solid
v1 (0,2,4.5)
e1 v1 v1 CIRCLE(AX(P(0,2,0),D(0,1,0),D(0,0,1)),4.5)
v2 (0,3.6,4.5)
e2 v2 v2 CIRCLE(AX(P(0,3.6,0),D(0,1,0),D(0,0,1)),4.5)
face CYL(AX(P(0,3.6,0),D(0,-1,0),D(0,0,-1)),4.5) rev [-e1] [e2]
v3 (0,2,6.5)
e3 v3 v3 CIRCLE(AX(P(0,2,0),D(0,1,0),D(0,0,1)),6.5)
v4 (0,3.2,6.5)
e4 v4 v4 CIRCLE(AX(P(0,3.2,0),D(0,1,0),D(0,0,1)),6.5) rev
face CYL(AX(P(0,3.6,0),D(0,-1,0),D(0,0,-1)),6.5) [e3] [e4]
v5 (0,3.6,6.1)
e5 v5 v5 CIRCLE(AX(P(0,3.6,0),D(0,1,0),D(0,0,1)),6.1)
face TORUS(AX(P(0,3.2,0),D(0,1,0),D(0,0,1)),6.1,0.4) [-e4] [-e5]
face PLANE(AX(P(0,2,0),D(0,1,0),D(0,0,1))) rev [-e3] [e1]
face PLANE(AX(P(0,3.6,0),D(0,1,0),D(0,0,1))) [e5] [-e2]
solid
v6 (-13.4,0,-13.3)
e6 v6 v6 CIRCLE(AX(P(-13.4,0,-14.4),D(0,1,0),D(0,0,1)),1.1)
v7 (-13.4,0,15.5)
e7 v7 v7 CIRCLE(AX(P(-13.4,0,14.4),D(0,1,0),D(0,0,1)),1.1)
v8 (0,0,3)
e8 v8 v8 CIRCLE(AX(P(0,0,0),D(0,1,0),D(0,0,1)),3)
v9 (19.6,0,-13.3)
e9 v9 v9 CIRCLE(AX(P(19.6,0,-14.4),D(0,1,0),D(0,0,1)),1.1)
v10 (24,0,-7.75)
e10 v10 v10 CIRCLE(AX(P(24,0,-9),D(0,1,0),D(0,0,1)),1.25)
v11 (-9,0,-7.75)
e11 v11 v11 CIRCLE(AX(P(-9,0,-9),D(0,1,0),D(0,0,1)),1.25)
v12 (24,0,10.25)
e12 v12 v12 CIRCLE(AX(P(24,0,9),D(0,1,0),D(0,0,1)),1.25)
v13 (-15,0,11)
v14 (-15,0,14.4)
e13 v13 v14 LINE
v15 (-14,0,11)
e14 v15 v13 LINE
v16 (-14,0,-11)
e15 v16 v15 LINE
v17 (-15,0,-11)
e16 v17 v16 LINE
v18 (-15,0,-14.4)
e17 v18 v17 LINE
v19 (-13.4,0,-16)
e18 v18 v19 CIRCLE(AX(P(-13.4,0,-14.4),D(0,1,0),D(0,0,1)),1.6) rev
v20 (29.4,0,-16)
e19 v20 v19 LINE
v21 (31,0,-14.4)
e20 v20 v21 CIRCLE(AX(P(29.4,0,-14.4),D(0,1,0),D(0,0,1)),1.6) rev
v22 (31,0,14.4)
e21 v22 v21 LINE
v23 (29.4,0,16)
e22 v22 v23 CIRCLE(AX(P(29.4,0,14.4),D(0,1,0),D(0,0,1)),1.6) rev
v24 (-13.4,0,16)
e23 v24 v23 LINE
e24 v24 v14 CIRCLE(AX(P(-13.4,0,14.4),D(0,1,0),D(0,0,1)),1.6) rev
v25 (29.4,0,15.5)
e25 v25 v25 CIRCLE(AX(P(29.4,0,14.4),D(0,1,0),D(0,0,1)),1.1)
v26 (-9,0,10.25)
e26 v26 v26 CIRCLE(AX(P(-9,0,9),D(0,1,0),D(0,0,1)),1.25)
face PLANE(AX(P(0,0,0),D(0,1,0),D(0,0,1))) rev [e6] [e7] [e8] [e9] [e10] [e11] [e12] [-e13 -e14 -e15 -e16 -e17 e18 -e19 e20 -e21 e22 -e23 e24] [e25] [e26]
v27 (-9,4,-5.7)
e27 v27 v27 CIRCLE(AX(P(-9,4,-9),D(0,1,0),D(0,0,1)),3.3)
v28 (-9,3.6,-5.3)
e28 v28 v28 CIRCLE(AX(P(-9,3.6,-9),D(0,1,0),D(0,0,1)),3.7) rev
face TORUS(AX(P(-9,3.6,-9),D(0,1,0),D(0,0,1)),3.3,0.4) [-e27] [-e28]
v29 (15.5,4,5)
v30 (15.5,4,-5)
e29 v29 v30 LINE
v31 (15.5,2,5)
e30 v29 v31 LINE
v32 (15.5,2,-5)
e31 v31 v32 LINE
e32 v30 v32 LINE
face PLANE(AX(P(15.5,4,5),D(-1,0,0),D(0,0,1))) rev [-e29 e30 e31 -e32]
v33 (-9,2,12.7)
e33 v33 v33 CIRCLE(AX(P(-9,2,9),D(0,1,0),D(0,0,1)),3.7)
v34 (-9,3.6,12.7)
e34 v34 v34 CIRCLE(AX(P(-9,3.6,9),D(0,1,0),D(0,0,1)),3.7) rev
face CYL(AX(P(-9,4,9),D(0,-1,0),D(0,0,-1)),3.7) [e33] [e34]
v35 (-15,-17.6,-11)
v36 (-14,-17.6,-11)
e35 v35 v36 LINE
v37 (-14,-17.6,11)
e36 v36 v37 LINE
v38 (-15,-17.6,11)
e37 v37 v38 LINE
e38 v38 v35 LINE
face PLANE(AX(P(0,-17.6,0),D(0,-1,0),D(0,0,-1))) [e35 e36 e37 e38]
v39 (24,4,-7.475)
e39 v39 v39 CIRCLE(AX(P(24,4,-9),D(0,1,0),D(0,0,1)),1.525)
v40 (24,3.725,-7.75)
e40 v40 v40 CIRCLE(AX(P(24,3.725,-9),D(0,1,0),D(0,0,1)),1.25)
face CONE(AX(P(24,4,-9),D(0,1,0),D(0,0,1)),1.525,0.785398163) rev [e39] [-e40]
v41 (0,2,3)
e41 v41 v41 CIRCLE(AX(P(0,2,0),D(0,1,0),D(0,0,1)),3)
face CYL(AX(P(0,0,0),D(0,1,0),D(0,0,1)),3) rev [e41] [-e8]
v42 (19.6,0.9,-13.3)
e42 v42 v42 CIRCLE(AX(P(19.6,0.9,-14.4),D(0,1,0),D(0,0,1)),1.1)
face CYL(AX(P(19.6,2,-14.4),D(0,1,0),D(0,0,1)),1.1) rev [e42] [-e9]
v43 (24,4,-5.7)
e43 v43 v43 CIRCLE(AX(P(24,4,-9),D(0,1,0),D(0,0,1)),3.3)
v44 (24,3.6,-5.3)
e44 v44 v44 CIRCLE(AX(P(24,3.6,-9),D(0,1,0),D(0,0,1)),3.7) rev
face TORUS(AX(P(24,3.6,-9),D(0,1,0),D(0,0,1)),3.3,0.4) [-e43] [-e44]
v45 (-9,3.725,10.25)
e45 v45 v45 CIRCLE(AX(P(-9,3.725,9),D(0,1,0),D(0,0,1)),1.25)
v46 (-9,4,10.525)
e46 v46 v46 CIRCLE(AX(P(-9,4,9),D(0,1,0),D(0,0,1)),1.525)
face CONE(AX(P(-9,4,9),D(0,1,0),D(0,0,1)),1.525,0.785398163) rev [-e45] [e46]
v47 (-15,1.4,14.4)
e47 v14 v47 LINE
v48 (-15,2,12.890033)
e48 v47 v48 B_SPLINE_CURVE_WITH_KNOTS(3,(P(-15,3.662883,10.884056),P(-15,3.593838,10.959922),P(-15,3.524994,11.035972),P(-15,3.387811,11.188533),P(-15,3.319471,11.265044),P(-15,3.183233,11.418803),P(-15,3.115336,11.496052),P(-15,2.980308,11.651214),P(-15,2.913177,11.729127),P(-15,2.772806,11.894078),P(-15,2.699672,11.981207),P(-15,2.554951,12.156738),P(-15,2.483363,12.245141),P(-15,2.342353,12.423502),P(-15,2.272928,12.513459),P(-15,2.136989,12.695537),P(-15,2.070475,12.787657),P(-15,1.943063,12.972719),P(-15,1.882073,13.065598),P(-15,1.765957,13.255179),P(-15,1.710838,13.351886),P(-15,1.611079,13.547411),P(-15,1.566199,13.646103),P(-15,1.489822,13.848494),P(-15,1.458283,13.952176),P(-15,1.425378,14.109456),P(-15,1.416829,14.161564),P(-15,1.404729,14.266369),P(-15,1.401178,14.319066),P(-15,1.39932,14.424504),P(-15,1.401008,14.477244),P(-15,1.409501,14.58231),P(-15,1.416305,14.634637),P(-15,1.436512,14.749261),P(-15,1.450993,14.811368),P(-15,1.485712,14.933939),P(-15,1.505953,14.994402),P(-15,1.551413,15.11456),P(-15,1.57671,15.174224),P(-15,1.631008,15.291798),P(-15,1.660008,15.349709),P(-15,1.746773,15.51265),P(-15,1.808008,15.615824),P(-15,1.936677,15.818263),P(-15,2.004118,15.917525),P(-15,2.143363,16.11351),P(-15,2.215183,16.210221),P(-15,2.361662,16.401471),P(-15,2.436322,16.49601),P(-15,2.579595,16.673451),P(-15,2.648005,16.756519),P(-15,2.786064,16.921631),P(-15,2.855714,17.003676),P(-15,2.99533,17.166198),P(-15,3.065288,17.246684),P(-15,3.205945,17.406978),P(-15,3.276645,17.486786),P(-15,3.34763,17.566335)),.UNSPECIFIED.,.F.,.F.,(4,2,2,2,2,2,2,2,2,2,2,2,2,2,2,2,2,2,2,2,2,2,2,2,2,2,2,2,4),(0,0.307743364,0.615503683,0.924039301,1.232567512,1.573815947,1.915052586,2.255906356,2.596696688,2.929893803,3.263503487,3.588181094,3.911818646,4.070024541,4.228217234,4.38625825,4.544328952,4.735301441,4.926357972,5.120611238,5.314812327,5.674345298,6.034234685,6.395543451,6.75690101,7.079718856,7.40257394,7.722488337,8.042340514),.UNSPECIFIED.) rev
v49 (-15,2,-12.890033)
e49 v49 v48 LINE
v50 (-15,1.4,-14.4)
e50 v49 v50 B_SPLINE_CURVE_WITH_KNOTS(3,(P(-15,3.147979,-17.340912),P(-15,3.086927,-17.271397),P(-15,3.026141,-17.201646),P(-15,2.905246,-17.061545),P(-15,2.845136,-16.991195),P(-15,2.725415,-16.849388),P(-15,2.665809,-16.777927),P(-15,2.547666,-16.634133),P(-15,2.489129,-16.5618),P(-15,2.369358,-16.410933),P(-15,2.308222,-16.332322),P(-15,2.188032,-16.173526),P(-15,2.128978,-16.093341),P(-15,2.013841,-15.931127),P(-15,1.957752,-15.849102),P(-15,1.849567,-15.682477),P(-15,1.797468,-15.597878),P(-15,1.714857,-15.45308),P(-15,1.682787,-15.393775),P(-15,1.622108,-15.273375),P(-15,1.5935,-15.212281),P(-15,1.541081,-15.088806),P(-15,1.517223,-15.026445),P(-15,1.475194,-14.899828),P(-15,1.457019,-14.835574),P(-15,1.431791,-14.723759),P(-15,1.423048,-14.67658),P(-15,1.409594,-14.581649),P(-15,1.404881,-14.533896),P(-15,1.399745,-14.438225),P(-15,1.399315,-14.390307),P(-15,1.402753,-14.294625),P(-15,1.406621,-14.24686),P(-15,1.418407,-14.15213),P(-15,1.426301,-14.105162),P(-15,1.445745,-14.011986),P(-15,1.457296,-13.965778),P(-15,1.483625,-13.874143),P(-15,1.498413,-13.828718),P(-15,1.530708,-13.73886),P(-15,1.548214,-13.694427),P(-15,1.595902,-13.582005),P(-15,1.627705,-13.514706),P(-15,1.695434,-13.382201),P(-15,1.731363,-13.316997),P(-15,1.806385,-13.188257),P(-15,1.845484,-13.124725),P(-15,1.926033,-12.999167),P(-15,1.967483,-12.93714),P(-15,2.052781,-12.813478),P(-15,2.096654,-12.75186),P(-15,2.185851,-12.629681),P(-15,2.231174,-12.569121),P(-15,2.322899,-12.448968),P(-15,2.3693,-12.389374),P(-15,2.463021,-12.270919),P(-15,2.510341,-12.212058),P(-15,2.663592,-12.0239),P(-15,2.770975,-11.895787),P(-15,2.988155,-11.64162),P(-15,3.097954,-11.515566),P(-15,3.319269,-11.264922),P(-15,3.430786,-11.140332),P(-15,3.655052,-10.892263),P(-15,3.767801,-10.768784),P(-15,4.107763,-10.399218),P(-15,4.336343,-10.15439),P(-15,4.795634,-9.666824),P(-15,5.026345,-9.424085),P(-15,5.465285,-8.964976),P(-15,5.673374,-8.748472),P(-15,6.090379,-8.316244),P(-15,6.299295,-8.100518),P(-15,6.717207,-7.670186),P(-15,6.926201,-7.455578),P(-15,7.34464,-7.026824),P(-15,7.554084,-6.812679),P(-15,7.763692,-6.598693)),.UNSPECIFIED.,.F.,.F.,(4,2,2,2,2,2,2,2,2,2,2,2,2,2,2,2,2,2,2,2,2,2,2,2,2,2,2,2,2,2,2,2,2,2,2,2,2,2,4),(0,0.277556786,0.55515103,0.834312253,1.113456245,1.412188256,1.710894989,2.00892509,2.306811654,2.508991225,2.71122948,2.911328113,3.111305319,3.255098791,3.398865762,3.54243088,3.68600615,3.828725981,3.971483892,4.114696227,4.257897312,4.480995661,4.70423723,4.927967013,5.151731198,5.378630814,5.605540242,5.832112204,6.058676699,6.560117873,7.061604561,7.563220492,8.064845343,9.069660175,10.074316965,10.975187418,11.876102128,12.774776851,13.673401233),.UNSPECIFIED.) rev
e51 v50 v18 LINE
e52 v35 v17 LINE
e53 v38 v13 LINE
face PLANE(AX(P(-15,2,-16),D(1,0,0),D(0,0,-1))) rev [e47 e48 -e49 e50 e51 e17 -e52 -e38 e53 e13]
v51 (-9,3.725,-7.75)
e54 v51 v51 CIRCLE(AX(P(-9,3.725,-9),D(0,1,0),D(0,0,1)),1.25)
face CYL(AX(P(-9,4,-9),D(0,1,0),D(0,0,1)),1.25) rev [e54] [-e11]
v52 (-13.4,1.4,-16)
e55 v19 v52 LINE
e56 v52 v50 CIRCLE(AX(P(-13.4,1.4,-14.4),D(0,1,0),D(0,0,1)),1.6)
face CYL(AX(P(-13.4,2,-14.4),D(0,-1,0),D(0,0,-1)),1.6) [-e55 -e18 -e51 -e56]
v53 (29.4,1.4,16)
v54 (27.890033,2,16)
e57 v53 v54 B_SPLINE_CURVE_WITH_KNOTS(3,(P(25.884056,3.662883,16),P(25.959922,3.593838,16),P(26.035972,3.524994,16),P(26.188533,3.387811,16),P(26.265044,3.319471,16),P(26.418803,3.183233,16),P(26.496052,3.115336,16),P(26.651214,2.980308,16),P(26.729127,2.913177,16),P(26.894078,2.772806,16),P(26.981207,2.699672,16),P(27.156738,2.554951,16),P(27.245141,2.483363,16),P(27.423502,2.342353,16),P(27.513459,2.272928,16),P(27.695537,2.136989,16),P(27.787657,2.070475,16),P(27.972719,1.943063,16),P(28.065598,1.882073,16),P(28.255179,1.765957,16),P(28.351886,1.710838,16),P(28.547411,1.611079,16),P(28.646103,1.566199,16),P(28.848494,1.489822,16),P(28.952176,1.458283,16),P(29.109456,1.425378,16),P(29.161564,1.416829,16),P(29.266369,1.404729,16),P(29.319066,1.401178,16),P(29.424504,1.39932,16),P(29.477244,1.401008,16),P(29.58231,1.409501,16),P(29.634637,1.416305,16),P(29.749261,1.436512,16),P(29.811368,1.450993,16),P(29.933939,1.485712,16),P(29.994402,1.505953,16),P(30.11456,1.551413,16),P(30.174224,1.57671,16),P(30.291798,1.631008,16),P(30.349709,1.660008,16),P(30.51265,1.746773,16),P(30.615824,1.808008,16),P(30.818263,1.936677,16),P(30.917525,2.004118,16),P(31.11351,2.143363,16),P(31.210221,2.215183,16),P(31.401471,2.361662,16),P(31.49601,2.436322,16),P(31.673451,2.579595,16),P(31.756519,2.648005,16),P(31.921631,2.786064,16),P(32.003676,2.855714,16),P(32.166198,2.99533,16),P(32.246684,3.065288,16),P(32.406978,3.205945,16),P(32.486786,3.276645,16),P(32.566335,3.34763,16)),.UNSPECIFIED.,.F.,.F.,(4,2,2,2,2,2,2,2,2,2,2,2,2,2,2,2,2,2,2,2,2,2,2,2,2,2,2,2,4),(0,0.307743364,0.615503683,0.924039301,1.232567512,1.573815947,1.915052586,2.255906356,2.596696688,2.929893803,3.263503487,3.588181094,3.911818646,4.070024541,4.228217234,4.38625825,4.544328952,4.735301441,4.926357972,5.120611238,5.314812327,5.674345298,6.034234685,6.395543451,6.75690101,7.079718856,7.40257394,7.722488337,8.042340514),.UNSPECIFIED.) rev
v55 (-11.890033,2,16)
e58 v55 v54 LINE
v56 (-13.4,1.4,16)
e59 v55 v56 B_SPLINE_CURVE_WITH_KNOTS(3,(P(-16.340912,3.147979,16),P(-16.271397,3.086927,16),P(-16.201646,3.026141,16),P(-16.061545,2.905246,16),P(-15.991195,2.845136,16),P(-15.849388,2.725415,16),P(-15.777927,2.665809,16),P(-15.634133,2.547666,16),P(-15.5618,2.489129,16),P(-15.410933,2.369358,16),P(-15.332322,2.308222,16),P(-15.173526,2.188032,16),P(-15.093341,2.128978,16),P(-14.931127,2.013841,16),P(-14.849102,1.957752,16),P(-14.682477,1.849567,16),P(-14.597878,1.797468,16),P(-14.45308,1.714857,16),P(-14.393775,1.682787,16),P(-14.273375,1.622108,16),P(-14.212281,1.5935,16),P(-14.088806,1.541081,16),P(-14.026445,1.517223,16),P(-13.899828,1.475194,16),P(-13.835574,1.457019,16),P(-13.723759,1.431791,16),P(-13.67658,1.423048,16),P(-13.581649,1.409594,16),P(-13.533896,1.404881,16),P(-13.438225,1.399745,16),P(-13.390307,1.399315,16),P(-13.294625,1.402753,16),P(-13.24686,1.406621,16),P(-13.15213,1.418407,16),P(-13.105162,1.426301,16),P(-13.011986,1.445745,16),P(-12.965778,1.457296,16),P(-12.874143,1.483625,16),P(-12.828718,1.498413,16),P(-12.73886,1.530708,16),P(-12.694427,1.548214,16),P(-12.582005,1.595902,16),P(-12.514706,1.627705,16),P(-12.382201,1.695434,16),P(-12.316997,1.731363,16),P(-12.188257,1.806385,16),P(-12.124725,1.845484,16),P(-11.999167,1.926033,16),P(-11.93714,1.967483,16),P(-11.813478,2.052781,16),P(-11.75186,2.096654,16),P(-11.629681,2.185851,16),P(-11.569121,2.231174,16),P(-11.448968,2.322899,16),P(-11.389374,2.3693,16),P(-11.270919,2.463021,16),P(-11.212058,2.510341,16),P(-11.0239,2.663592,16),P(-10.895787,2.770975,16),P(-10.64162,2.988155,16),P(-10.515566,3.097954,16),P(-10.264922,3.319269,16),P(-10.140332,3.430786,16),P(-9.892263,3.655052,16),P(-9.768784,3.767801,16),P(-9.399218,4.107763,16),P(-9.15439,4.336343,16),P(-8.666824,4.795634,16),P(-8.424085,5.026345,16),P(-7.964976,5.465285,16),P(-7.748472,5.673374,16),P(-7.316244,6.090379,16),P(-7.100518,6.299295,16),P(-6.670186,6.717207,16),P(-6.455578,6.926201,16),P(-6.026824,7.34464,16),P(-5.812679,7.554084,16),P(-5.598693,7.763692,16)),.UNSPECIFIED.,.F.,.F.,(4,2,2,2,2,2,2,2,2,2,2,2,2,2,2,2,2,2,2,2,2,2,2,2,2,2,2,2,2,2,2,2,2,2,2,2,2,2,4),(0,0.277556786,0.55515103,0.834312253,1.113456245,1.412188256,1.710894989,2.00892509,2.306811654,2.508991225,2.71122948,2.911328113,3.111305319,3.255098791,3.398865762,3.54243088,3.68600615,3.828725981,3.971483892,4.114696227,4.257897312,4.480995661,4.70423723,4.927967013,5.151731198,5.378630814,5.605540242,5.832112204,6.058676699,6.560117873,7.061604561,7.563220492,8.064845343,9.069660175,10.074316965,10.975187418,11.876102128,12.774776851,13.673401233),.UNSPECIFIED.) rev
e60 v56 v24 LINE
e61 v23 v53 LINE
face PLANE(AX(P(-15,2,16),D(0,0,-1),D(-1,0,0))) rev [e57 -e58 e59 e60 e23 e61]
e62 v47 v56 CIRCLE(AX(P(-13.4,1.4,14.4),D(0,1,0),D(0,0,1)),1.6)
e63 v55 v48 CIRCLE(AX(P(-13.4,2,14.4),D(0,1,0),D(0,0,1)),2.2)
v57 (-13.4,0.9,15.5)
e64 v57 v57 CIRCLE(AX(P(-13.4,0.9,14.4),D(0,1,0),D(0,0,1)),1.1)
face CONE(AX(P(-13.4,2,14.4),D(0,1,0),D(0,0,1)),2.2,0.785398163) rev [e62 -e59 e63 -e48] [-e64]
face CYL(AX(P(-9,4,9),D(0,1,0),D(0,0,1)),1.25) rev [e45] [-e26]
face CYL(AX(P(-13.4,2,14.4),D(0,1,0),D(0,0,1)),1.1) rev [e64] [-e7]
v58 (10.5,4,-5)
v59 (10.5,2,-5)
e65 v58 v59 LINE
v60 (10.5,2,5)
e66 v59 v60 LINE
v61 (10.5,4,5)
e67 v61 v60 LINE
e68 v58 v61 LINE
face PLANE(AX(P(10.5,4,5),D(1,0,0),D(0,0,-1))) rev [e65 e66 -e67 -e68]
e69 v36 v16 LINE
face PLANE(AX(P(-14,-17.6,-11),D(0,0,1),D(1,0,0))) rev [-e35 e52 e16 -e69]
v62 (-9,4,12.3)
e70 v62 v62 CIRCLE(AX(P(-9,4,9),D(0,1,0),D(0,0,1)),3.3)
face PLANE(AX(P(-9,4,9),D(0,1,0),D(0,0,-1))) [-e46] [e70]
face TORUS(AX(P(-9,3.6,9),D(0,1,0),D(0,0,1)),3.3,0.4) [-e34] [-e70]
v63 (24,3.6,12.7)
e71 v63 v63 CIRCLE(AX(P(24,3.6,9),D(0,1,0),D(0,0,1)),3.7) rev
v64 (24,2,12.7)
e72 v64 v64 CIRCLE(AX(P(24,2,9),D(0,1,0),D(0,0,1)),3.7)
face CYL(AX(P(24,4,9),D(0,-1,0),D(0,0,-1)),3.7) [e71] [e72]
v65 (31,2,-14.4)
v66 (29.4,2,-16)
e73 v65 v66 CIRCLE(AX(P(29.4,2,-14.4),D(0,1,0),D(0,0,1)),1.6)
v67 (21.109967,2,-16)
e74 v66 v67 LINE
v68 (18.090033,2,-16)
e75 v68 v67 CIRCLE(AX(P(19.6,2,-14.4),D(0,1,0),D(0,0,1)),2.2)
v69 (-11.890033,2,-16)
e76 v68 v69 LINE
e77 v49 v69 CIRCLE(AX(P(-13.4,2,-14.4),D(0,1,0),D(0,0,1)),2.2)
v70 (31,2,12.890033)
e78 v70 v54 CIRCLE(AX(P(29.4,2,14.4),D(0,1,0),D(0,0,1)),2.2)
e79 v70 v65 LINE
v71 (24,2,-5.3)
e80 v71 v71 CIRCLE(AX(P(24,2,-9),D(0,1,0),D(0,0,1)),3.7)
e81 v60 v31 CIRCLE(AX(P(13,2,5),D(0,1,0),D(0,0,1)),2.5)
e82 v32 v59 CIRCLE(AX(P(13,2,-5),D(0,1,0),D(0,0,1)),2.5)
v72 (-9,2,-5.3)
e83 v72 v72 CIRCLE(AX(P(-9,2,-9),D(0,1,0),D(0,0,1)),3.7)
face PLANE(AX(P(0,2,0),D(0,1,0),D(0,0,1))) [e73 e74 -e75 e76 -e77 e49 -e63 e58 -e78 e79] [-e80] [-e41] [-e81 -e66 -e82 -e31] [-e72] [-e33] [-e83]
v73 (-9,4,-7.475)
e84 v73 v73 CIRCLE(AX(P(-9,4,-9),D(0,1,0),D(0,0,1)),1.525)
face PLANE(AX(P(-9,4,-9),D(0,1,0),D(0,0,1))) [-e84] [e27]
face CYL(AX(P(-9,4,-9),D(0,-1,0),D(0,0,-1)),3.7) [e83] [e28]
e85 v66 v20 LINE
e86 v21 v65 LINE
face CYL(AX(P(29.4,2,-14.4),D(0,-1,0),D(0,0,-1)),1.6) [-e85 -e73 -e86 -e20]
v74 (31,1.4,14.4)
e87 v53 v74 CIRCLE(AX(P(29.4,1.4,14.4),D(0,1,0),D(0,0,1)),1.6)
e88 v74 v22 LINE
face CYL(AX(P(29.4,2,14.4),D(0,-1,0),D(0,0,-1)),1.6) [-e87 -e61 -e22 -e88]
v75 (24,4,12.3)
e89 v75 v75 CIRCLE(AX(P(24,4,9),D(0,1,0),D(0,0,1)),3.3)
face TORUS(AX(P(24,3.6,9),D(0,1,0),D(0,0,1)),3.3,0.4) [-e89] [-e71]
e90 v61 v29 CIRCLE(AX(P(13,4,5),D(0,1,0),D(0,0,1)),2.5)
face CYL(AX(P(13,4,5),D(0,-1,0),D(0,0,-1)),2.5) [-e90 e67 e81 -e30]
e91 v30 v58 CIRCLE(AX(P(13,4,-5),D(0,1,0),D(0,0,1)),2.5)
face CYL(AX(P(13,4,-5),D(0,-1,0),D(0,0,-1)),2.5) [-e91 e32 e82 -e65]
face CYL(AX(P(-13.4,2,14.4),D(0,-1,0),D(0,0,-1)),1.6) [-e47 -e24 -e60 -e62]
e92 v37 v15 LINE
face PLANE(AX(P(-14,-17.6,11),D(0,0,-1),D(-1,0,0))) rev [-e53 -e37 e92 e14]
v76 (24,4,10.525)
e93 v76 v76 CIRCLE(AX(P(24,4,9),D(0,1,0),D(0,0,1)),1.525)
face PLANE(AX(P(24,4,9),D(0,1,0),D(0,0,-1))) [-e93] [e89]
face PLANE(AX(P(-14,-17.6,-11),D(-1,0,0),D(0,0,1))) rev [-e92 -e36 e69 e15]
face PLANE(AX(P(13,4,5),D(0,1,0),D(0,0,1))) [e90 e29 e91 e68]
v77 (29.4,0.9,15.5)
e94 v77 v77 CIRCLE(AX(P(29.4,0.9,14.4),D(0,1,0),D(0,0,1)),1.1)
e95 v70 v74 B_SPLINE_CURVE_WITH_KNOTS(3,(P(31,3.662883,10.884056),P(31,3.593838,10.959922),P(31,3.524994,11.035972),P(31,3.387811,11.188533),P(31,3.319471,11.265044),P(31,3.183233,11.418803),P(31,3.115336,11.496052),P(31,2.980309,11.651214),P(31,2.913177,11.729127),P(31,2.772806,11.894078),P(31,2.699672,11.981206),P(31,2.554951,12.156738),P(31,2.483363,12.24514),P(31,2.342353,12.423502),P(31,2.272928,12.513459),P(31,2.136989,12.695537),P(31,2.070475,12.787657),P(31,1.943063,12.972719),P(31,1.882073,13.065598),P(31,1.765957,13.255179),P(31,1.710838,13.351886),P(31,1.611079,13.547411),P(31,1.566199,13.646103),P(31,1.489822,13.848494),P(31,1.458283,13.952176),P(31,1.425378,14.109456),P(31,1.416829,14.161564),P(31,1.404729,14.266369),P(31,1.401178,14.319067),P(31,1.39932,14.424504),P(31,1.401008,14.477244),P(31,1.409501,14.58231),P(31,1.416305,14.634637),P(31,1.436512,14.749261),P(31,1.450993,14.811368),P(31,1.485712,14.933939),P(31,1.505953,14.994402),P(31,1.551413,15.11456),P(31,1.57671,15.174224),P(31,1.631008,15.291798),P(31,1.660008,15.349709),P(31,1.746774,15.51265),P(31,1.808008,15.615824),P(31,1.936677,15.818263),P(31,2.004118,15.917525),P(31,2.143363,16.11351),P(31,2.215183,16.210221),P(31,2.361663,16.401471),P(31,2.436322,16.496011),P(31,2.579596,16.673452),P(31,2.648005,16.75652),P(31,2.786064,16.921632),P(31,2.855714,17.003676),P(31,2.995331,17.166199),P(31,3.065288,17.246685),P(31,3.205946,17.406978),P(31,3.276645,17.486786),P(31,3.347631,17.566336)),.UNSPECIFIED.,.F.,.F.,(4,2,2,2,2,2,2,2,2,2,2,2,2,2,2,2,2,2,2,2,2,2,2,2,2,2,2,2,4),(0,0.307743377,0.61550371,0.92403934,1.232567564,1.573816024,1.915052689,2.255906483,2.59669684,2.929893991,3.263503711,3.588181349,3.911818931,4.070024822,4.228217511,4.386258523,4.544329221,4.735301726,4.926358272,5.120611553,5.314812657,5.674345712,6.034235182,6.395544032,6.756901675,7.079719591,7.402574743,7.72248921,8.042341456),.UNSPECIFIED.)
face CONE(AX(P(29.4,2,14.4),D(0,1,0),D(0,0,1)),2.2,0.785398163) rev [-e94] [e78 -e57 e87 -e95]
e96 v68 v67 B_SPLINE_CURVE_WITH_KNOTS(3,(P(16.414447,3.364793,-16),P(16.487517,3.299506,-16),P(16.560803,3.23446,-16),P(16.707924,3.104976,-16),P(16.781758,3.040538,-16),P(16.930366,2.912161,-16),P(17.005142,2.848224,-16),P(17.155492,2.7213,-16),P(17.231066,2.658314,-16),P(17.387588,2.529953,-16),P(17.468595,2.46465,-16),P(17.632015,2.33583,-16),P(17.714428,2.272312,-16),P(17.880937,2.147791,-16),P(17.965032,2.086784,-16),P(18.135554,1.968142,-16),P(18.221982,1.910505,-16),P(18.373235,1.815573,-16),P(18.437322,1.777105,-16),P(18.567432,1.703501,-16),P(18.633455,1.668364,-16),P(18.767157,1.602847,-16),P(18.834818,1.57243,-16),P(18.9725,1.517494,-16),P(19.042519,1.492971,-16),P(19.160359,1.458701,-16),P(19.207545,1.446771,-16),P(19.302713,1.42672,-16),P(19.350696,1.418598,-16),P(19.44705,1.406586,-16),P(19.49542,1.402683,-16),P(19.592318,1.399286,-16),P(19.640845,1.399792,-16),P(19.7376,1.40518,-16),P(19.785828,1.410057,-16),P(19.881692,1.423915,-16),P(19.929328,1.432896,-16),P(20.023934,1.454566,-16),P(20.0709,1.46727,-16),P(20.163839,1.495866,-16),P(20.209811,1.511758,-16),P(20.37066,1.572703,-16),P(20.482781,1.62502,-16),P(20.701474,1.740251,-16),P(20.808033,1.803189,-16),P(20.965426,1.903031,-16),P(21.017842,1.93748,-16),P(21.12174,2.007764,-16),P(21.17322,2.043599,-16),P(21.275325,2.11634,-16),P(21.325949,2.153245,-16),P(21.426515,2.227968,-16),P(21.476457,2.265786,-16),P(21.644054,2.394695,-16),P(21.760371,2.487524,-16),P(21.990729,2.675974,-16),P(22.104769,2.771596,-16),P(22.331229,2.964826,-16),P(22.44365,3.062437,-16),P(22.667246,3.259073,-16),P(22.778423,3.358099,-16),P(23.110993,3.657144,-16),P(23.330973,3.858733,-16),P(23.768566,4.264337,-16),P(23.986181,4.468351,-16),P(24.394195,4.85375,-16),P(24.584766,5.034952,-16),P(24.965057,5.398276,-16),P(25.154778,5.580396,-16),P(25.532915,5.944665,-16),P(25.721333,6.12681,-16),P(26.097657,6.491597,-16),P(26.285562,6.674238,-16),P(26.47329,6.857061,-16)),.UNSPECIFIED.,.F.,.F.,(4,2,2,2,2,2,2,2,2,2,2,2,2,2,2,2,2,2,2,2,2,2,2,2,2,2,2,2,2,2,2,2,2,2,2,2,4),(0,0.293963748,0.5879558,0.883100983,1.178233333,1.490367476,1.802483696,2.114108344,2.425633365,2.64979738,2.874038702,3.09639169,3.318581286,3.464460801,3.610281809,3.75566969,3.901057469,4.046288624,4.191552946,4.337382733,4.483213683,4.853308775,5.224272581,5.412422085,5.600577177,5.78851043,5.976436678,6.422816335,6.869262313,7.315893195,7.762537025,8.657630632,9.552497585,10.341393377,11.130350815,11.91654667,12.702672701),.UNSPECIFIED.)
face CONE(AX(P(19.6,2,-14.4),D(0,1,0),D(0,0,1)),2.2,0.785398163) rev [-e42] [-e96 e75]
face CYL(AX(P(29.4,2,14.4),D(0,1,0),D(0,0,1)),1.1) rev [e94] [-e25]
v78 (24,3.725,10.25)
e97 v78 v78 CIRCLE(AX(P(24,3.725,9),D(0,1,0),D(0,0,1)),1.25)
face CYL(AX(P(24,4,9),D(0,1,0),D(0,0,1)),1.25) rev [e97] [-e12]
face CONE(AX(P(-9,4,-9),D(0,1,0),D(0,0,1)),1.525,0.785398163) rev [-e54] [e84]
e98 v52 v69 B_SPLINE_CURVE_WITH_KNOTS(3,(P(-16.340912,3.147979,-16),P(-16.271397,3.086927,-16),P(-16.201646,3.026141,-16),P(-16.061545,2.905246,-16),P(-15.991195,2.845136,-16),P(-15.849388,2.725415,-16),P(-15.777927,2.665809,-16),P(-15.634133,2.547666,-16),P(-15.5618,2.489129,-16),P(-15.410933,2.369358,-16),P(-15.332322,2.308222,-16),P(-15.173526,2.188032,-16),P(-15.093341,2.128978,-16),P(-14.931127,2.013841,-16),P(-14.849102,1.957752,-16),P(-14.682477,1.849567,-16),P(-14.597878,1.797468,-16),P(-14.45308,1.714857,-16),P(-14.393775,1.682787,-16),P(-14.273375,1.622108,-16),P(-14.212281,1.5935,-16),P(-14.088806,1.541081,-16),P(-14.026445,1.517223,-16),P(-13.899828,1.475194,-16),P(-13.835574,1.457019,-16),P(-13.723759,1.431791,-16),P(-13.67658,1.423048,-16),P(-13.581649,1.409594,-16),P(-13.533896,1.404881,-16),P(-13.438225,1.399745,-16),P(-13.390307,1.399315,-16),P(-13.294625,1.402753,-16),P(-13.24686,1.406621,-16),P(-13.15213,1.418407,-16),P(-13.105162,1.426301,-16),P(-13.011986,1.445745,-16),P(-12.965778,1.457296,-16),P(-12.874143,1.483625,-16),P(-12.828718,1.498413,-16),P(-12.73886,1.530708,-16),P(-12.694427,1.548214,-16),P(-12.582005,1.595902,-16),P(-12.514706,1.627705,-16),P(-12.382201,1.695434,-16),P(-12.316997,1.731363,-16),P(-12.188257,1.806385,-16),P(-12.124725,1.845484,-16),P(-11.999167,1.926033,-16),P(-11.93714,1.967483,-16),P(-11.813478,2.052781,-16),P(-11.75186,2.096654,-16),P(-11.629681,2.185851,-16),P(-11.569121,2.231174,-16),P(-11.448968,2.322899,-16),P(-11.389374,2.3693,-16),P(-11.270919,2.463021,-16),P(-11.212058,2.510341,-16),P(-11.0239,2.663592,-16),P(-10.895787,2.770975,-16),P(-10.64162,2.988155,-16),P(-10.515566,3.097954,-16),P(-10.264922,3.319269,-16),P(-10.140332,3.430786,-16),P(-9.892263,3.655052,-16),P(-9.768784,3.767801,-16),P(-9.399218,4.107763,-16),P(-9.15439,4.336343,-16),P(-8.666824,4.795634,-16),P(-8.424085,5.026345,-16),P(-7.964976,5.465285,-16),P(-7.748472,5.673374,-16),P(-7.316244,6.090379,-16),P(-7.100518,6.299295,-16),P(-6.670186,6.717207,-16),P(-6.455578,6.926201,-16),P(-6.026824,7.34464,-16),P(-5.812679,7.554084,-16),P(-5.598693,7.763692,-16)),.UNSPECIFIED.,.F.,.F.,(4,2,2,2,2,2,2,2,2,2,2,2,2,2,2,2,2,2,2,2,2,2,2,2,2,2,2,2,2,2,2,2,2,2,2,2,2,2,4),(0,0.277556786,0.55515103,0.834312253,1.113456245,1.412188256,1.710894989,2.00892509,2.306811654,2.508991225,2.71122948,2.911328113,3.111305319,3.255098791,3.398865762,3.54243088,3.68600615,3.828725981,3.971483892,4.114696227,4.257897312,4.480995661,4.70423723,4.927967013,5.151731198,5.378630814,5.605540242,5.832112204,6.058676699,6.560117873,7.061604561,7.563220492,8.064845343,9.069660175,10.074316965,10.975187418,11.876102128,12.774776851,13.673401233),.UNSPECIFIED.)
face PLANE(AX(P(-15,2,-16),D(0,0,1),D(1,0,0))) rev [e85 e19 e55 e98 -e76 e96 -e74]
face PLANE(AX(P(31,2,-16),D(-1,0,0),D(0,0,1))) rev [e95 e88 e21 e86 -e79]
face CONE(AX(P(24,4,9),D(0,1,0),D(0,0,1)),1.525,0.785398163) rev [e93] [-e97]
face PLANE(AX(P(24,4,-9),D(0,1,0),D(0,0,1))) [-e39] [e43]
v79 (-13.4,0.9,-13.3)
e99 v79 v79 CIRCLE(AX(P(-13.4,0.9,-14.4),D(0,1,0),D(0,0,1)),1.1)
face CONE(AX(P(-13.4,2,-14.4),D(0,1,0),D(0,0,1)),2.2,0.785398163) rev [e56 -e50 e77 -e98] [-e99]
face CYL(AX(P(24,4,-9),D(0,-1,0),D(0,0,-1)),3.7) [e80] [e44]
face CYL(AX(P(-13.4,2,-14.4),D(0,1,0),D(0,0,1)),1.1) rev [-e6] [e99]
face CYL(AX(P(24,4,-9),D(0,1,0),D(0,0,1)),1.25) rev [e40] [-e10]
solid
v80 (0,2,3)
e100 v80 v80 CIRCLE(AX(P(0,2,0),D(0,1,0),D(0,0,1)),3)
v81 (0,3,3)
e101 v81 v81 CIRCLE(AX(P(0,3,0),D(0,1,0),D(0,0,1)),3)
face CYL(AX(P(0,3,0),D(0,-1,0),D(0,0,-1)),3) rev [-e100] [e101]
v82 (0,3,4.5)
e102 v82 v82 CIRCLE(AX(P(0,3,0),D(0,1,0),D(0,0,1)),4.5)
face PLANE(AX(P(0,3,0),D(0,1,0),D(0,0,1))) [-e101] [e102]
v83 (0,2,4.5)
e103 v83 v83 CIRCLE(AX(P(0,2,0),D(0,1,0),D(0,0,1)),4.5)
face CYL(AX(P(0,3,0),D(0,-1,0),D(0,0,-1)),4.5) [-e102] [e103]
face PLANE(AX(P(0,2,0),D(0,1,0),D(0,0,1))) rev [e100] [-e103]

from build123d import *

# Parameters (mm, degrees)
SKETCH2_W                                      = 46
SKETCH2_H                                      = 32
BOSS_EXTRUDE2_DEPTH                            = 2
SKETCH6_R                                      = 3
CUT_EXTRUDE1_DEPTH                             = 35.942810419
SKETCH7_R                                      = 4.5
SKETCH7_R_2                                    = 3
BOSS_EXTRUDE4_DEPTH                            = 1
SKETCH8_R                                      = 6.5
SKETCH8_R_2                                    = 4.5
BOSS_EXTRUDE5_DEPTH                            = 1.6
SKETCH3_R                                      = 3.7
BOSS_EXTRUDE3_DEPTH                            = 2
FILLET3_R                                      = 0.4
LPATTERN1_COUNT                                = 2
LPATTERN1_PITCH                                = 33
BOSS_EXTRUDE6_DEPTH                            = 2
MIRROR2_COPY_1_SKETCH_R                        = 3.7
MIRROR2_COPY_1_DEPTH                           = 2
CSK_FOR_M2_FLAT_HEAD_MACHINE_SCREW1_AT_2_COUNT = 2
CSK_FOR_M2_FLAT_HEAD_MACHINE_SCREW1_AT_2_PITCH = 33
CSK_FOR_M2_FLAT_HEAD_MACHINE_SCREW1_AT_3_COUNT = 2
CSK_FOR_M2_FLAT_HEAD_MACHINE_SCREW1_AT_3_PITCH = 51.587595408
CSK_FOR_M2_FLAT_HEAD_MACHINE_SCREW1_AT_4_COUNT = 2
CSK_FOR_M2_FLAT_HEAD_MACHINE_SCREW1_AT_4_PITCH = 28.8
FILLET1_R                                      = 1.6
SKETCH12_W                                     = 1
SKETCH12_H                                     = 22
BOSS_EXTRUDE7_DEPTH                            = 17.6
FILLET5_R                                      = 0.4


with BuildPart() as part:
    # Sketch2 → Boss-Extrude2 (new body)
    with BuildSketch(Plane(origin=(0, 0, 0), x_dir=(1, 0, 0), z_dir=(0, 1, 0))):
        with Locations((8, 0)):
            Rectangle(SKETCH2_W, SKETCH2_H)
    extrude(amount=BOSS_EXTRUDE2_DEPTH)

    # Sketch6 → Cut-Extrude1 (cut, through all)
    with BuildSketch(Plane(origin=(0, 2, 0), x_dir=(1, 0, 0), z_dir=(0, 1, 0))):
        with Locations(Location((0, 0, 0), (0, 0, 270))):
            Circle(SKETCH6_R)
    extrude(amount=-CUT_EXTRUDE1_DEPTH, mode=Mode.SUBTRACT)

    # Sketch3 → Boss-Extrude3 (add)
    with BuildSketch(Plane(origin=(0, 2, 0), x_dir=(1, 0, 0), z_dir=(0, 1, 0))):
        with Locations(Location((-9, 9, 0), (0, 0, 270))):
            Circle(SKETCH3_R)
    boss_extrude3 = extrude(amount=BOSS_EXTRUDE3_DEPTH)

    # Sketch4 → M3x0.5 Tapped Hole1 (revolve, cut)
    with BuildSketch(Plane(origin=(-9, 4, -9), x_dir=(0, 0, 1), z_dir=(1, 0, 0))):
        Polygon((0, 0), (0, 4), (1.25, 4), (1.25, 0.275), (1.525, 0), align=None)
    m3x0_5_tapped_hole1 = revolve(axis=Axis((-9, 10.35, -9), (0, -1, 0)), mode=Mode.SUBTRACT)

    # LPattern1: Boss-Extrude3, M3x0.5 Tapped Hole1 ×2
    with Locations(*[(i * LPATTERN1_PITCH, 0, 0) for i in range(1, LPATTERN1_COUNT)]):
        add(boss_extrude3)
        add(m3x0_5_tapped_hole1, mode=Mode.SUBTRACT)

    # Sketch9 → Boss-Extrude6 (add)
    with BuildSketch(Plane(origin=(0, 2, 0), x_dir=(1, 0, 0), z_dir=(0, 1, 0))):
        with BuildLine():
            Line((10.5, -5), (10.5, 5))
            ThreePointArc((10.5, 5), (13, 7.5), (15.5, 5))
            Line((15.5, 5), (15.5, -5))
            ThreePointArc((15.5, -5), (13, -7.5), (10.5, -5))
        make_face()
    extrude(amount=BOSS_EXTRUDE6_DEPTH)

    # Mirror2: Boss-Extrude3, M3x0.5 Tapped Hole1 across plane
    add(boss_extrude3.mirror(Plane.XY))
    add(m3x0_5_tapped_hole1.mirror(Plane.XY), mode=Mode.SUBTRACT)

    # Mirror2 copy 1 sketch → Mirror2 copy 1 (add)
    with BuildSketch(Plane(origin=(33, 2, 0), x_dir=(1, 0, 0), z_dir=(0, 1, 0))):
        with Locations((-9, -9)):
            Circle(MIRROR2_COPY_1_SKETCH_R)
    extrude(amount=MIRROR2_COPY_1_DEPTH)

    # Mirror2 copy 2 sketch → Mirror2 copy 2 (revolve, cut)
    with BuildSketch(Plane(origin=(24, 4, 9), x_dir=(0, 0, -1), z_dir=(1, 0, 0))):
        Polygon((0, 0), (0, -4), (1.25, -4), (1.25, -0.275), (1.525, 0), align=None)
    revolve(axis=Axis((24, 10.35, 9), (0, 1, 0)), mode=Mode.SUBTRACT)

    # Sketch10 → CSK for M2 Flat Head Machine Screw1 (revolve, cut)
    with BuildSketch(Plane(origin=(-13.4, 2, -14.4), x_dir=(0, 0, 1), z_dir=(1, 0, 0))):
        Polygon((0, 0), (0, 2), (1.1, 2), (1.1, 1.1), (2.2, 0), align=None)
    csk_for_m2_flat_head_machine_screw1 = revolve(axis=Axis((-13.4, 8.35, -14.4), (0, -1, 0)), mode=Mode.SUBTRACT)

    # CSK for M2 Flat Head Machine Screw1 at 2: CSK for M2 Flat Head Machine Screw1 ×2
    with Locations(*[(i * CSK_FOR_M2_FLAT_HEAD_MACHINE_SCREW1_AT_2_PITCH, 0, 0) for i in range(1, CSK_FOR_M2_FLAT_HEAD_MACHINE_SCREW1_AT_2_COUNT)]):
        add(csk_for_m2_flat_head_machine_screw1, mode=Mode.SUBTRACT)

    # CSK for M2 Flat Head Machine Screw1 at 3: CSK for M2 Flat Head Machine Screw1 ×2
    with Locations(*[Vector(0.8296568130639779, 0, 0.5582737433701533) * (i * CSK_FOR_M2_FLAT_HEAD_MACHINE_SCREW1_AT_3_PITCH) for i in range(1, CSK_FOR_M2_FLAT_HEAD_MACHINE_SCREW1_AT_3_COUNT)]):
        add(csk_for_m2_flat_head_machine_screw1, mode=Mode.SUBTRACT)

    # CSK for M2 Flat Head Machine Screw1 at 4: CSK for M2 Flat Head Machine Screw1 ×2
    with Locations(*[(0, 0, i * CSK_FOR_M2_FLAT_HEAD_MACHINE_SCREW1_AT_4_PITCH) for i in range(1, CSK_FOR_M2_FLAT_HEAD_MACHINE_SCREW1_AT_4_COUNT)]):
        add(csk_for_m2_flat_head_machine_screw1, mode=Mode.SUBTRACT)

    # Fillet1
    fillet1_edges = [part.edges().sort_by_distance(p)[0] for p in [
        (31, 1, -16),
        (31, 1, 16),
        (-15, 1, -16),
        (-15, 1, 16),
    ]]
    fillet(fillet1_edges, radius=FILLET1_R - 0.0001)  # a hair under: the kernel refuses the full size

    # Sketch12 → Boss-Extrude7 (add)
    with BuildSketch(Plane.XZ):
        with Locations((-14.5, 0)):
            Rectangle(SKETCH12_W, SKETCH12_H)
    extrude(amount=BOSS_EXTRUDE7_DEPTH)

    # Fillet5
    fillet5_edges = [part.edges().sort_by_distance(p)[0] for p in [
        (-9, 4, -12.7),
        (24, 4, -12.7),
        (-9, 4, 12.7),
        (20.3, 4, 9),
    ]]
    fillet(fillet5_edges, radius=FILLET5_R)


with BuildPart() as body_2:
    # Sketch7 → Boss-Extrude4 (new body)
    with BuildSketch(Plane(origin=(0, 2, 0), x_dir=(1, 0, 0), z_dir=(0, 1, 0))):
        with Locations(Location((0, 0, 0), (0, 0, 270))):
            Circle(SKETCH7_R)
        with Locations(Location((0, 0, 0), (0, 0, 270))):
            Circle(SKETCH7_R_2, mode=Mode.SUBTRACT)
    extrude(amount=BOSS_EXTRUDE4_DEPTH)


with BuildPart() as body_3:
    # Sketch8 → Boss-Extrude5 (new body)
    with BuildSketch(Plane(origin=(0, 2, 0), x_dir=(1, 0, 0), z_dir=(0, 1, 0))):
        with Locations(Location((0, 0, 0), (0, 0, 270))):
            Circle(SKETCH8_R)
        with Locations(Location((0, 0, 0), (0, 0, 270))):
            Circle(SKETCH8_R_2, mode=Mode.SUBTRACT)
    extrude(amount=BOSS_EXTRUDE5_DEPTH)

    # Fillet3
    fillet3_edges = [body_3.edges().sort_by_distance(p)[0] for p in [
        (0, 3.6, -6.5),
    ]]
    fillet(fillet3_edges, radius=FILLET3_R)


solid = Compound([part.part, body_2.part, body_3.part])
